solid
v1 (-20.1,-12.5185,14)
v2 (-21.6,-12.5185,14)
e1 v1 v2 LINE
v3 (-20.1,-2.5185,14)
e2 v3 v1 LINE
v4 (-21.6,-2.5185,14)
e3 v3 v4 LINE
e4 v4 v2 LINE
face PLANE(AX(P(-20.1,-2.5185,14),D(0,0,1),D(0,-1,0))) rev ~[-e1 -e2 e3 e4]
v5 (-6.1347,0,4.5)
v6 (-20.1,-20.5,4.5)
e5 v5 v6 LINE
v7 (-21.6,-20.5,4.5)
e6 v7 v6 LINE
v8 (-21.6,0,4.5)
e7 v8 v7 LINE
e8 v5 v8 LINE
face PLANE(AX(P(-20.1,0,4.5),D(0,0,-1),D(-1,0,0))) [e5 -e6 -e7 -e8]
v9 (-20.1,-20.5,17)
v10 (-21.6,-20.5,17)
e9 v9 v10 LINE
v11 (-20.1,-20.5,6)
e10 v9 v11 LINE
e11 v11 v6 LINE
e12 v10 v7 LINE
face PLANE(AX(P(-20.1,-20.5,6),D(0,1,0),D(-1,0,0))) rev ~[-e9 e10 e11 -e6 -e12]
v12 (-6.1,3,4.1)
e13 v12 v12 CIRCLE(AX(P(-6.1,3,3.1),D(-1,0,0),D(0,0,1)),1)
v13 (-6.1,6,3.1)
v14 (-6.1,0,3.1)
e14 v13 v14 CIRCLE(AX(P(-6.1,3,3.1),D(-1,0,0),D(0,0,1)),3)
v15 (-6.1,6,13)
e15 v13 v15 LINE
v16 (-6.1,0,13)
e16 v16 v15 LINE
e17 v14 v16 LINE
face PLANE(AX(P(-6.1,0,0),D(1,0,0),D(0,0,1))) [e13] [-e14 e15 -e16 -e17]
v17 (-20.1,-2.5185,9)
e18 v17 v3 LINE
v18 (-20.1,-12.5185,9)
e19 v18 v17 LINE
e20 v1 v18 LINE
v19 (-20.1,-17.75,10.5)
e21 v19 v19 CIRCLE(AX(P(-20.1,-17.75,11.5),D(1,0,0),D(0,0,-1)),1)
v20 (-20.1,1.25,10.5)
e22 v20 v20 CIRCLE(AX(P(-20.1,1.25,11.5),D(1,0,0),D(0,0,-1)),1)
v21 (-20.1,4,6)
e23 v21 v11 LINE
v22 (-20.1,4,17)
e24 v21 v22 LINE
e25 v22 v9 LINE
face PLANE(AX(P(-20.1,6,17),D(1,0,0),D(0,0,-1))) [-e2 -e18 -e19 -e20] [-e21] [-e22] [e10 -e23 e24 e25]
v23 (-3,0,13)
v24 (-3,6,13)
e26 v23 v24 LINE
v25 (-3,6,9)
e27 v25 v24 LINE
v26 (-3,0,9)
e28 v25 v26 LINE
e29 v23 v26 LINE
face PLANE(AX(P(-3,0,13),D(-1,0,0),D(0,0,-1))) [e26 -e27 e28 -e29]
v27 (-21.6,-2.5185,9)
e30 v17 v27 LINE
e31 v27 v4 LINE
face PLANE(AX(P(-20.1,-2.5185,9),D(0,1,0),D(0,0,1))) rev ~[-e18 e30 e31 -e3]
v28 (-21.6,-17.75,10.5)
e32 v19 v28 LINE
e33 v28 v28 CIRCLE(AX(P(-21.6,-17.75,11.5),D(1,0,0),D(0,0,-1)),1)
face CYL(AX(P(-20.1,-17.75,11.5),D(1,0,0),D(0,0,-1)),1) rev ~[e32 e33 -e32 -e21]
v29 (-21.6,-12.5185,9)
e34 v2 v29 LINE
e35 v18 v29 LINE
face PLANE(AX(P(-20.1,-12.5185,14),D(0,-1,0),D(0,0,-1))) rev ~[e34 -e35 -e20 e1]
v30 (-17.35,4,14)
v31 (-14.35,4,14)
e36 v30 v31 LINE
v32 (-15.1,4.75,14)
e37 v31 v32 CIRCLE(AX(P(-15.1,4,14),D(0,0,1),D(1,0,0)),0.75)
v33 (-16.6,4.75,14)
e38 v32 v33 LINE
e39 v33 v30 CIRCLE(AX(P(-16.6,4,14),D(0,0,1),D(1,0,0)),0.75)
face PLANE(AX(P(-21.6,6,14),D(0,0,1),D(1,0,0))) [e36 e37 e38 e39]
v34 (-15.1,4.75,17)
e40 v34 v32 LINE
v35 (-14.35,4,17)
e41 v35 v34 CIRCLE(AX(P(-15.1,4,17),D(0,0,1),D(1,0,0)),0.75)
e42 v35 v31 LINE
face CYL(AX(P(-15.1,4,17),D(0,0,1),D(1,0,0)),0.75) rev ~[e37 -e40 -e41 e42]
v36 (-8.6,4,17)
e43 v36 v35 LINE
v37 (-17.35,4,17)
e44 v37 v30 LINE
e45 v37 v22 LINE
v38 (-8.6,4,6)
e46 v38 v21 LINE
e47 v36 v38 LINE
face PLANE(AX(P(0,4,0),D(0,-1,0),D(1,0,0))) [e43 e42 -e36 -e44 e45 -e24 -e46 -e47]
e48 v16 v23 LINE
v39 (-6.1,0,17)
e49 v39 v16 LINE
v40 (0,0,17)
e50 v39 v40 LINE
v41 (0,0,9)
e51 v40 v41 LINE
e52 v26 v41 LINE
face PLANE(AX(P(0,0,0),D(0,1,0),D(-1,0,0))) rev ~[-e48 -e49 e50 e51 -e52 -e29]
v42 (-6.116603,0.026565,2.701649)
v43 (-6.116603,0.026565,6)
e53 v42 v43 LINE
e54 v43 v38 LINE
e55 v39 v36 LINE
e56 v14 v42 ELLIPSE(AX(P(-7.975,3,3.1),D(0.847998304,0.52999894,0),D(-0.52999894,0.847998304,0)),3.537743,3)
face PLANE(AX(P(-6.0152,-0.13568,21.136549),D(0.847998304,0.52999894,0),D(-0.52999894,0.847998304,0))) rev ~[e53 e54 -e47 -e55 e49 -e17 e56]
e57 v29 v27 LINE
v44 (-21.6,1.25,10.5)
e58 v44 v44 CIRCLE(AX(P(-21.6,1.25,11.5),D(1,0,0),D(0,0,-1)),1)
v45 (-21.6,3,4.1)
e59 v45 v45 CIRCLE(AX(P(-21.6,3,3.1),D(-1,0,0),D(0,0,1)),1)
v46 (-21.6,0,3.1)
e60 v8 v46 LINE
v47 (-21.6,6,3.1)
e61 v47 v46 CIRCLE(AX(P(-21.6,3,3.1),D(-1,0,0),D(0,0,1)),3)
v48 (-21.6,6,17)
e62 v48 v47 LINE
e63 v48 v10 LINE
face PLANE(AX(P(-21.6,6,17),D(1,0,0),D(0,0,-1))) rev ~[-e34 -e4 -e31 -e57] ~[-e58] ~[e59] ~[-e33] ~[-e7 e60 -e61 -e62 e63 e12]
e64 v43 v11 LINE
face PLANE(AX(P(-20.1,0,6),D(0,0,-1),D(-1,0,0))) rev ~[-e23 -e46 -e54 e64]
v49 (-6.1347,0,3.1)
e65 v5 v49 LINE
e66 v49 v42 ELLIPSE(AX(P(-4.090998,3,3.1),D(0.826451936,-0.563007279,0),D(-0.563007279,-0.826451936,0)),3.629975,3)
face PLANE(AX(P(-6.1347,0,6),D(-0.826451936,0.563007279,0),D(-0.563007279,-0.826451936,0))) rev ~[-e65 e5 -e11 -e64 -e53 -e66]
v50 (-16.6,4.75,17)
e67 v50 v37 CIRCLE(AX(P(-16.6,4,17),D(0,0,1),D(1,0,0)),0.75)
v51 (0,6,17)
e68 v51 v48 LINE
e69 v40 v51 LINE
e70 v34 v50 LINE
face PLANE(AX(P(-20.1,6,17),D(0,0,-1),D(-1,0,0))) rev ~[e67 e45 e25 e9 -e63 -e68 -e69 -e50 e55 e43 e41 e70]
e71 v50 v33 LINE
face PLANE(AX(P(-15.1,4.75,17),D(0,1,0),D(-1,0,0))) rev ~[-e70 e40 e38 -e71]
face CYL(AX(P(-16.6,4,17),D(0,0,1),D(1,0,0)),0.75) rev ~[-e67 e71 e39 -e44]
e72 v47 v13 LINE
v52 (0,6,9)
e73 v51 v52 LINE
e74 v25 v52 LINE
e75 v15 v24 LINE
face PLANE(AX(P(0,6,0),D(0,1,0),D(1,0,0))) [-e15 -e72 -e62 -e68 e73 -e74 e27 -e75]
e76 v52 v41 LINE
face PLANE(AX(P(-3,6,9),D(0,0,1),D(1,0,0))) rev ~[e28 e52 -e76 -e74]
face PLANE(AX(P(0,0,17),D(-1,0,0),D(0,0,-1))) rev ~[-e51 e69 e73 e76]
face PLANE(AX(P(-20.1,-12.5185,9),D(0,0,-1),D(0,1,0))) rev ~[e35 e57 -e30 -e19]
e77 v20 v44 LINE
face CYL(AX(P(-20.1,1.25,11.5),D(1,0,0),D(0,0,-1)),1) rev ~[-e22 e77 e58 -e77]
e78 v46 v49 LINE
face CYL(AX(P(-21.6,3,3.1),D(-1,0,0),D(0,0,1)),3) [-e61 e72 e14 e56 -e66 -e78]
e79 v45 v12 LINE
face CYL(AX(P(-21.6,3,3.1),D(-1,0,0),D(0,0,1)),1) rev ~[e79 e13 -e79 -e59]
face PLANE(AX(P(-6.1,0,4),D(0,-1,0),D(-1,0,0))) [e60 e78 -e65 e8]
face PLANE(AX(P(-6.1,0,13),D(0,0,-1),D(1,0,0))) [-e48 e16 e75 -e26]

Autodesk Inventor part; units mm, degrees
ref_plane "YZ Plane" through (0, 0, 0) normal (1, 0, 0) x (0, 1, 0)
ref_plane "XZ Plane" through (0, 0, 0) normal (0, 1, 0) x (-1, 0, 0)
ref_plane "XY Plane" through (0, 0, 0) normal (0, 0, 1) x (1, 0, 0)
sketch "Sketch1" plane through (0, 0, 0) normal (0, 1, 0) x (-1, 0, 0)
  line L0 (0, 0) -> (21.6, 0)
  line L1 (21.6, 0) -> (21.6, 17)
  line L2 (21.6, 17) -> (0, 17)
  line L3 (0, 17) -> (0, 0)
  line L4 (6.1, 13) -> (3, 13)
  line L5 (3, 13) -> (3, 0)
  line L6 (3, 0) -> (6.1, 0)
  line L7 (6.1, 0) -> (6.1, 13)
  line L8 (21.6, 17) -> (9.1, 17)
  line L9 (9.1, 17) -> (9.1, 0)
  line L10 (9.1, 0) -> (21.6, 0)
  line L11 (21.6, 0) -> (21.6, 17)
  line L12 (9.1, 17) -> (21.6, 6.2)
  point P0 (21.6, 6.2)
  point P1 (9.1, 17)
  dimension "d1" = 17
  dimension "d2" = 3.1
  dimension "d3" = 3
  dimension "d4" = 3
  dimension "d5" = 6.2
  dimension "d17" = 13
  dimension "d18" = 12.5
extrude "Extrusion1" add sketch "Sketch1" along normal blind 6 contours L3 L2 L9 L0 L7 L4 L5 | L12 L1 L0 L9
sketch "Sketch2" plane through (-21.6, 0, 0) normal (-1, 0, 0) x (0, 0, 1)
  circle A0 centre (3.1, 3) radius 3
  line L0 (0, 0) -> (13, 0) projected
  line L1 (0, 0) -> (0, 6) projected
  line L2 (17, 6) -> (0, 6) projected
  line L3 (0, 0) -> (6.2302, 0)
  line L4 (6.2302, 0) -> (6.2302, 6)
  line L5 (6.2302, 6) -> (0, 6)
  line L6 (0, 6) -> (0, 0)
  circle A1 centre (3.1, 3) radius 1
  point P0 (3.1, 6)
  point P1 (3.1, 0)
  dimension "d8" = 3.1
  dimension "d9" = 2
extrude "Extrusion2" cut sketch "Sketch2" against normal up to surface (18.6 mm away) contours A0 L0 L1 L2 | A1
sketch "Sketch3" plane through (0, 6, 0) normal (0, 1, 0) x (1, 0, 0)
  line L0 (-3, 0) -> (-3, -13) projected
  line L1 (0, 0) -> (-3, 0) projected
  line L2 (-3, -9) -> (0, -9)
  line L3 (0, -9) -> (0, 0)
  line L4 (0, 0) -> (-3, 0)
  line L5 (-3, 0) -> (-3, -9)
  line L6 (-3, -13) -> (-6.1, -13) projected
  line L7 (-9.1, -17) -> (0, -17) projected
  dimension "d13" = 8
extrude "Extrusion3" cut sketch "Sketch3" against normal blind 10
sketch "Sketch4" plane through (0, 0, 0) normal (0, -1, 0) x (1, 0, 0)
  line L0 (-21.6, 6.2) -> (-9.1, 17) projected
  line L1 (-9.1, 17) -> (-20.1, 17)
  line L2 (-20.1, 17) -> (-20.1, 7.496)
  line L3 (-20.1, 7.496) -> (-9.1, 7.496)
  line L4 (-9.1, 7.496) -> (-9.1, 17)
  line L5 (-6.1, 13) -> (-6.1, 3.1) projected
  point P0 (0, 0)
  dimension "d19" = 14
extrude "Extrusion4" cut sketch "Sketch4" against normal blind 4 contours L0 L4 L3
sketch "Sketch5" plane through (0, 0, 0) normal (0, -1, 0) x (1, 0, 0)
  line L0 (-9.1, 17) -> (-9.1, 7.496) projected
  line L1 (-9.1, 17) -> (-8.6, 17)
  line L2 (-8.6, 17) -> (-8.6, 7.496)
  line L3 (-8.6, 7.496) -> (-9.1, 7.496)
  line L4 (-9.1, 7.496) -> (-9.1, 17)
  line L5 (-6.1, 13) -> (-6.1, 3.1) projected
  point P0 (0, 0)
  dimension "d22" = 2.5
extrude "Extrusion5" cut sketch "Sketch5" against normal up to surface (4 mm away)
sketch "Sketch7" plane through (0, 4, 0) normal (0, -1, 0) x (1, 0, 0)
  line L0 (-8.6, 7.496) -> (-8.6, 17) projected
  line L1 (-8.6, 17) -> (-20.1, 17)
  line L2 (-20.1, 17) -> (-20.1, 6)
  line L3 (-20.1, 6) -> (-8.6, 6)
  line L4 (-8.6, 6) -> (-8.6, 17)
  point P0 (0, 0)
  dimension "d25" = 11.5
  dimension "d26" = 11
extrude "Extrusion6" cut sketch "Sketch7" along normal blind 10
sketch "Sketch8" plane through (0, 4, 0) normal (0, -1, 0) x (1, 0, 0)
  line L0 (-20.1, 7.496) -> (-20.1, 6) projected
  line L1 (-8.6, 6) -> (-8.6, 17) projected
  line L2 (-20.1, 6) -> (-8.6, 6)
  line L3 (-8.6, 6) -> (-8.6, 17)
  line L4 (-8.6, 17) -> (-20.1, 17)
  line L5 (-20.1, 17) -> (-20.1, 6)
  point P0 (0, 0)
extrude "Extrusion7" add sketch "Sketch8" against normal up to surface (2 mm away)
sketch "Sketch9" plane through (0, 6, 0) normal (0, 1, 0) x (1, 0, 0)
  line L0 (-20.1, -17) -> (-20.1, -7.496) projected
  line L1 (-21.6, -3.1) -> (-21.6, -6.2) projected
  line L2 (-20.1, -17) -> (-21.6, -17)
  line L3 (-21.6, -17) -> (-21.6, -6)
  line L4 (-21.6, -6) -> (-20.1, -6)
  line L5 (-20.1, -6) -> (-20.1, -17)
  point P0 (0, 0)
  dimension "d31" = 11
extrude "Extrusion8" add sketch "Sketch9" against normal blind 26.5
sketch "Sketch11" plane through (-20.1, 0, 6) normal (0, 0, -1) x (-1, 0, 0)
  line L0 (0, -20.5) -> (1.5, -20.5) projected
  line L1 (1.5, -20.5) -> (-13.9653, -20.5)
  line L2 (-13.9653, -20.5) -> (-13.9653, 0)
  line L3 (-13.9653, 0) -> (1.5, 0)
  line L4 (1.5, 0) -> (1.5, -20.5)
  line L5 (-13.9653, 0) -> (0, -20.5)
  point P0 (-20.1, 0)
extrude "Extrusion9" add sketch "Sketch11" along normal blind 2 contours L5 L3 L4 L0
sketch "Sketch13" plane through (-20.1, 4, 17) normal (1, 0, 0) x (0, 0, -1)
  circle A0 centre (5.5, -2.75) radius 1
  circle A1 centre (5.5, -21.75) radius 1
  line L0 (11, -24.5) -> (0, -24.5) projected
  line L1 (0, 0) -> (11, 0) projected
  line L2 (8, -6.5185) -> (3, -6.5185)
  line L3 (3, -6.5185) -> (3, -16.5185)
  line L4 (3, -16.5185) -> (8, -16.5185)
  line L5 (8, -16.5185) -> (8, -6.5185)
  line L6 (0, 0) -> (0, -24.5) projected
  point P0 (17, -4)
  dimension "d36" = 2.75
  dimension "d37" = 2.75
  dimension "d38" = 2
  dimension "d39" = 2
  dimension "d40" = 10
  dimension "d41" = 5
  dimension "d42" = 3
  dimension "d43" = 5.5
  dimension "d44" = 5.5
extrude "Extrusion10" cut sketch "Sketch13" against normal blind 2
chamfer "Chamfer1" distance 2.5 distance2 4 1 edges at (-8.6, 0, 11.5)
sketch "Sketch14" plane through (-20.1, 0, 4) normal (0, 0, -1) x (-1, 0, 0)
  line L0 (1.5, 6) -> (1.5, -20.5) projected
  line L1 (-14, 6) -> (-14, 0) projected
  line L2 (1.5, -20.5) -> (-14, -20.5)
  line L3 (-14, -20.5) -> (-14, 0)
  line L4 (-14, 0) -> (1.5, 0)
  line L5 (1.5, 0) -> (1.5, -20.5)
  point P0 (-20.1, 0)
extrude "Extrusion11" cut sketch "Sketch14" against normal blind 0.5
sketch "Sketch15" plane through (-21.6, 6, 17) normal (0, 0, 1) x (1, 0, 0)
  line L0 (1.5, -2) -> (13, -2) projected
  circle A0 centre (5, -2) radius 0.75
  circle A1 centre (6.5, -2) radius 0.75
  line L1 (5, -2) -> (5.9454, -2)
  line L2 (5, -1.4951) -> (5, -2)
  line L3 (1.5, -2) -> (1.5, -26.5) projected
  line L4 (5, -2) -> (6.5, -2)
  line L5 (6.5, -2) -> (6.5, -1.25)
  line L6 (6.5, -1.25) -> (5, -1.25)
  line L7 (5, -1.25) -> (5, -2)
  point P0 (21.6, -6)
  point P1 (7.25, -2)
  point P2 (5, -1.25)
  point P3 (4.25, -2)
  dimension "d53" = 1.5
  dimension "d52" = 1.5
  dimension "d54" = 1.5
  dimension "d56" = 0
extrude "Extrusion12" cut sketch "Sketch15" against normal blind 3 contours L2 L7 A0 L0 | L0 A0 L7 L2 | A1 L5 L0 | A0 L6 A1 | A1 L0 L5
properties part number "Pi3B_spacer_R_switch"
